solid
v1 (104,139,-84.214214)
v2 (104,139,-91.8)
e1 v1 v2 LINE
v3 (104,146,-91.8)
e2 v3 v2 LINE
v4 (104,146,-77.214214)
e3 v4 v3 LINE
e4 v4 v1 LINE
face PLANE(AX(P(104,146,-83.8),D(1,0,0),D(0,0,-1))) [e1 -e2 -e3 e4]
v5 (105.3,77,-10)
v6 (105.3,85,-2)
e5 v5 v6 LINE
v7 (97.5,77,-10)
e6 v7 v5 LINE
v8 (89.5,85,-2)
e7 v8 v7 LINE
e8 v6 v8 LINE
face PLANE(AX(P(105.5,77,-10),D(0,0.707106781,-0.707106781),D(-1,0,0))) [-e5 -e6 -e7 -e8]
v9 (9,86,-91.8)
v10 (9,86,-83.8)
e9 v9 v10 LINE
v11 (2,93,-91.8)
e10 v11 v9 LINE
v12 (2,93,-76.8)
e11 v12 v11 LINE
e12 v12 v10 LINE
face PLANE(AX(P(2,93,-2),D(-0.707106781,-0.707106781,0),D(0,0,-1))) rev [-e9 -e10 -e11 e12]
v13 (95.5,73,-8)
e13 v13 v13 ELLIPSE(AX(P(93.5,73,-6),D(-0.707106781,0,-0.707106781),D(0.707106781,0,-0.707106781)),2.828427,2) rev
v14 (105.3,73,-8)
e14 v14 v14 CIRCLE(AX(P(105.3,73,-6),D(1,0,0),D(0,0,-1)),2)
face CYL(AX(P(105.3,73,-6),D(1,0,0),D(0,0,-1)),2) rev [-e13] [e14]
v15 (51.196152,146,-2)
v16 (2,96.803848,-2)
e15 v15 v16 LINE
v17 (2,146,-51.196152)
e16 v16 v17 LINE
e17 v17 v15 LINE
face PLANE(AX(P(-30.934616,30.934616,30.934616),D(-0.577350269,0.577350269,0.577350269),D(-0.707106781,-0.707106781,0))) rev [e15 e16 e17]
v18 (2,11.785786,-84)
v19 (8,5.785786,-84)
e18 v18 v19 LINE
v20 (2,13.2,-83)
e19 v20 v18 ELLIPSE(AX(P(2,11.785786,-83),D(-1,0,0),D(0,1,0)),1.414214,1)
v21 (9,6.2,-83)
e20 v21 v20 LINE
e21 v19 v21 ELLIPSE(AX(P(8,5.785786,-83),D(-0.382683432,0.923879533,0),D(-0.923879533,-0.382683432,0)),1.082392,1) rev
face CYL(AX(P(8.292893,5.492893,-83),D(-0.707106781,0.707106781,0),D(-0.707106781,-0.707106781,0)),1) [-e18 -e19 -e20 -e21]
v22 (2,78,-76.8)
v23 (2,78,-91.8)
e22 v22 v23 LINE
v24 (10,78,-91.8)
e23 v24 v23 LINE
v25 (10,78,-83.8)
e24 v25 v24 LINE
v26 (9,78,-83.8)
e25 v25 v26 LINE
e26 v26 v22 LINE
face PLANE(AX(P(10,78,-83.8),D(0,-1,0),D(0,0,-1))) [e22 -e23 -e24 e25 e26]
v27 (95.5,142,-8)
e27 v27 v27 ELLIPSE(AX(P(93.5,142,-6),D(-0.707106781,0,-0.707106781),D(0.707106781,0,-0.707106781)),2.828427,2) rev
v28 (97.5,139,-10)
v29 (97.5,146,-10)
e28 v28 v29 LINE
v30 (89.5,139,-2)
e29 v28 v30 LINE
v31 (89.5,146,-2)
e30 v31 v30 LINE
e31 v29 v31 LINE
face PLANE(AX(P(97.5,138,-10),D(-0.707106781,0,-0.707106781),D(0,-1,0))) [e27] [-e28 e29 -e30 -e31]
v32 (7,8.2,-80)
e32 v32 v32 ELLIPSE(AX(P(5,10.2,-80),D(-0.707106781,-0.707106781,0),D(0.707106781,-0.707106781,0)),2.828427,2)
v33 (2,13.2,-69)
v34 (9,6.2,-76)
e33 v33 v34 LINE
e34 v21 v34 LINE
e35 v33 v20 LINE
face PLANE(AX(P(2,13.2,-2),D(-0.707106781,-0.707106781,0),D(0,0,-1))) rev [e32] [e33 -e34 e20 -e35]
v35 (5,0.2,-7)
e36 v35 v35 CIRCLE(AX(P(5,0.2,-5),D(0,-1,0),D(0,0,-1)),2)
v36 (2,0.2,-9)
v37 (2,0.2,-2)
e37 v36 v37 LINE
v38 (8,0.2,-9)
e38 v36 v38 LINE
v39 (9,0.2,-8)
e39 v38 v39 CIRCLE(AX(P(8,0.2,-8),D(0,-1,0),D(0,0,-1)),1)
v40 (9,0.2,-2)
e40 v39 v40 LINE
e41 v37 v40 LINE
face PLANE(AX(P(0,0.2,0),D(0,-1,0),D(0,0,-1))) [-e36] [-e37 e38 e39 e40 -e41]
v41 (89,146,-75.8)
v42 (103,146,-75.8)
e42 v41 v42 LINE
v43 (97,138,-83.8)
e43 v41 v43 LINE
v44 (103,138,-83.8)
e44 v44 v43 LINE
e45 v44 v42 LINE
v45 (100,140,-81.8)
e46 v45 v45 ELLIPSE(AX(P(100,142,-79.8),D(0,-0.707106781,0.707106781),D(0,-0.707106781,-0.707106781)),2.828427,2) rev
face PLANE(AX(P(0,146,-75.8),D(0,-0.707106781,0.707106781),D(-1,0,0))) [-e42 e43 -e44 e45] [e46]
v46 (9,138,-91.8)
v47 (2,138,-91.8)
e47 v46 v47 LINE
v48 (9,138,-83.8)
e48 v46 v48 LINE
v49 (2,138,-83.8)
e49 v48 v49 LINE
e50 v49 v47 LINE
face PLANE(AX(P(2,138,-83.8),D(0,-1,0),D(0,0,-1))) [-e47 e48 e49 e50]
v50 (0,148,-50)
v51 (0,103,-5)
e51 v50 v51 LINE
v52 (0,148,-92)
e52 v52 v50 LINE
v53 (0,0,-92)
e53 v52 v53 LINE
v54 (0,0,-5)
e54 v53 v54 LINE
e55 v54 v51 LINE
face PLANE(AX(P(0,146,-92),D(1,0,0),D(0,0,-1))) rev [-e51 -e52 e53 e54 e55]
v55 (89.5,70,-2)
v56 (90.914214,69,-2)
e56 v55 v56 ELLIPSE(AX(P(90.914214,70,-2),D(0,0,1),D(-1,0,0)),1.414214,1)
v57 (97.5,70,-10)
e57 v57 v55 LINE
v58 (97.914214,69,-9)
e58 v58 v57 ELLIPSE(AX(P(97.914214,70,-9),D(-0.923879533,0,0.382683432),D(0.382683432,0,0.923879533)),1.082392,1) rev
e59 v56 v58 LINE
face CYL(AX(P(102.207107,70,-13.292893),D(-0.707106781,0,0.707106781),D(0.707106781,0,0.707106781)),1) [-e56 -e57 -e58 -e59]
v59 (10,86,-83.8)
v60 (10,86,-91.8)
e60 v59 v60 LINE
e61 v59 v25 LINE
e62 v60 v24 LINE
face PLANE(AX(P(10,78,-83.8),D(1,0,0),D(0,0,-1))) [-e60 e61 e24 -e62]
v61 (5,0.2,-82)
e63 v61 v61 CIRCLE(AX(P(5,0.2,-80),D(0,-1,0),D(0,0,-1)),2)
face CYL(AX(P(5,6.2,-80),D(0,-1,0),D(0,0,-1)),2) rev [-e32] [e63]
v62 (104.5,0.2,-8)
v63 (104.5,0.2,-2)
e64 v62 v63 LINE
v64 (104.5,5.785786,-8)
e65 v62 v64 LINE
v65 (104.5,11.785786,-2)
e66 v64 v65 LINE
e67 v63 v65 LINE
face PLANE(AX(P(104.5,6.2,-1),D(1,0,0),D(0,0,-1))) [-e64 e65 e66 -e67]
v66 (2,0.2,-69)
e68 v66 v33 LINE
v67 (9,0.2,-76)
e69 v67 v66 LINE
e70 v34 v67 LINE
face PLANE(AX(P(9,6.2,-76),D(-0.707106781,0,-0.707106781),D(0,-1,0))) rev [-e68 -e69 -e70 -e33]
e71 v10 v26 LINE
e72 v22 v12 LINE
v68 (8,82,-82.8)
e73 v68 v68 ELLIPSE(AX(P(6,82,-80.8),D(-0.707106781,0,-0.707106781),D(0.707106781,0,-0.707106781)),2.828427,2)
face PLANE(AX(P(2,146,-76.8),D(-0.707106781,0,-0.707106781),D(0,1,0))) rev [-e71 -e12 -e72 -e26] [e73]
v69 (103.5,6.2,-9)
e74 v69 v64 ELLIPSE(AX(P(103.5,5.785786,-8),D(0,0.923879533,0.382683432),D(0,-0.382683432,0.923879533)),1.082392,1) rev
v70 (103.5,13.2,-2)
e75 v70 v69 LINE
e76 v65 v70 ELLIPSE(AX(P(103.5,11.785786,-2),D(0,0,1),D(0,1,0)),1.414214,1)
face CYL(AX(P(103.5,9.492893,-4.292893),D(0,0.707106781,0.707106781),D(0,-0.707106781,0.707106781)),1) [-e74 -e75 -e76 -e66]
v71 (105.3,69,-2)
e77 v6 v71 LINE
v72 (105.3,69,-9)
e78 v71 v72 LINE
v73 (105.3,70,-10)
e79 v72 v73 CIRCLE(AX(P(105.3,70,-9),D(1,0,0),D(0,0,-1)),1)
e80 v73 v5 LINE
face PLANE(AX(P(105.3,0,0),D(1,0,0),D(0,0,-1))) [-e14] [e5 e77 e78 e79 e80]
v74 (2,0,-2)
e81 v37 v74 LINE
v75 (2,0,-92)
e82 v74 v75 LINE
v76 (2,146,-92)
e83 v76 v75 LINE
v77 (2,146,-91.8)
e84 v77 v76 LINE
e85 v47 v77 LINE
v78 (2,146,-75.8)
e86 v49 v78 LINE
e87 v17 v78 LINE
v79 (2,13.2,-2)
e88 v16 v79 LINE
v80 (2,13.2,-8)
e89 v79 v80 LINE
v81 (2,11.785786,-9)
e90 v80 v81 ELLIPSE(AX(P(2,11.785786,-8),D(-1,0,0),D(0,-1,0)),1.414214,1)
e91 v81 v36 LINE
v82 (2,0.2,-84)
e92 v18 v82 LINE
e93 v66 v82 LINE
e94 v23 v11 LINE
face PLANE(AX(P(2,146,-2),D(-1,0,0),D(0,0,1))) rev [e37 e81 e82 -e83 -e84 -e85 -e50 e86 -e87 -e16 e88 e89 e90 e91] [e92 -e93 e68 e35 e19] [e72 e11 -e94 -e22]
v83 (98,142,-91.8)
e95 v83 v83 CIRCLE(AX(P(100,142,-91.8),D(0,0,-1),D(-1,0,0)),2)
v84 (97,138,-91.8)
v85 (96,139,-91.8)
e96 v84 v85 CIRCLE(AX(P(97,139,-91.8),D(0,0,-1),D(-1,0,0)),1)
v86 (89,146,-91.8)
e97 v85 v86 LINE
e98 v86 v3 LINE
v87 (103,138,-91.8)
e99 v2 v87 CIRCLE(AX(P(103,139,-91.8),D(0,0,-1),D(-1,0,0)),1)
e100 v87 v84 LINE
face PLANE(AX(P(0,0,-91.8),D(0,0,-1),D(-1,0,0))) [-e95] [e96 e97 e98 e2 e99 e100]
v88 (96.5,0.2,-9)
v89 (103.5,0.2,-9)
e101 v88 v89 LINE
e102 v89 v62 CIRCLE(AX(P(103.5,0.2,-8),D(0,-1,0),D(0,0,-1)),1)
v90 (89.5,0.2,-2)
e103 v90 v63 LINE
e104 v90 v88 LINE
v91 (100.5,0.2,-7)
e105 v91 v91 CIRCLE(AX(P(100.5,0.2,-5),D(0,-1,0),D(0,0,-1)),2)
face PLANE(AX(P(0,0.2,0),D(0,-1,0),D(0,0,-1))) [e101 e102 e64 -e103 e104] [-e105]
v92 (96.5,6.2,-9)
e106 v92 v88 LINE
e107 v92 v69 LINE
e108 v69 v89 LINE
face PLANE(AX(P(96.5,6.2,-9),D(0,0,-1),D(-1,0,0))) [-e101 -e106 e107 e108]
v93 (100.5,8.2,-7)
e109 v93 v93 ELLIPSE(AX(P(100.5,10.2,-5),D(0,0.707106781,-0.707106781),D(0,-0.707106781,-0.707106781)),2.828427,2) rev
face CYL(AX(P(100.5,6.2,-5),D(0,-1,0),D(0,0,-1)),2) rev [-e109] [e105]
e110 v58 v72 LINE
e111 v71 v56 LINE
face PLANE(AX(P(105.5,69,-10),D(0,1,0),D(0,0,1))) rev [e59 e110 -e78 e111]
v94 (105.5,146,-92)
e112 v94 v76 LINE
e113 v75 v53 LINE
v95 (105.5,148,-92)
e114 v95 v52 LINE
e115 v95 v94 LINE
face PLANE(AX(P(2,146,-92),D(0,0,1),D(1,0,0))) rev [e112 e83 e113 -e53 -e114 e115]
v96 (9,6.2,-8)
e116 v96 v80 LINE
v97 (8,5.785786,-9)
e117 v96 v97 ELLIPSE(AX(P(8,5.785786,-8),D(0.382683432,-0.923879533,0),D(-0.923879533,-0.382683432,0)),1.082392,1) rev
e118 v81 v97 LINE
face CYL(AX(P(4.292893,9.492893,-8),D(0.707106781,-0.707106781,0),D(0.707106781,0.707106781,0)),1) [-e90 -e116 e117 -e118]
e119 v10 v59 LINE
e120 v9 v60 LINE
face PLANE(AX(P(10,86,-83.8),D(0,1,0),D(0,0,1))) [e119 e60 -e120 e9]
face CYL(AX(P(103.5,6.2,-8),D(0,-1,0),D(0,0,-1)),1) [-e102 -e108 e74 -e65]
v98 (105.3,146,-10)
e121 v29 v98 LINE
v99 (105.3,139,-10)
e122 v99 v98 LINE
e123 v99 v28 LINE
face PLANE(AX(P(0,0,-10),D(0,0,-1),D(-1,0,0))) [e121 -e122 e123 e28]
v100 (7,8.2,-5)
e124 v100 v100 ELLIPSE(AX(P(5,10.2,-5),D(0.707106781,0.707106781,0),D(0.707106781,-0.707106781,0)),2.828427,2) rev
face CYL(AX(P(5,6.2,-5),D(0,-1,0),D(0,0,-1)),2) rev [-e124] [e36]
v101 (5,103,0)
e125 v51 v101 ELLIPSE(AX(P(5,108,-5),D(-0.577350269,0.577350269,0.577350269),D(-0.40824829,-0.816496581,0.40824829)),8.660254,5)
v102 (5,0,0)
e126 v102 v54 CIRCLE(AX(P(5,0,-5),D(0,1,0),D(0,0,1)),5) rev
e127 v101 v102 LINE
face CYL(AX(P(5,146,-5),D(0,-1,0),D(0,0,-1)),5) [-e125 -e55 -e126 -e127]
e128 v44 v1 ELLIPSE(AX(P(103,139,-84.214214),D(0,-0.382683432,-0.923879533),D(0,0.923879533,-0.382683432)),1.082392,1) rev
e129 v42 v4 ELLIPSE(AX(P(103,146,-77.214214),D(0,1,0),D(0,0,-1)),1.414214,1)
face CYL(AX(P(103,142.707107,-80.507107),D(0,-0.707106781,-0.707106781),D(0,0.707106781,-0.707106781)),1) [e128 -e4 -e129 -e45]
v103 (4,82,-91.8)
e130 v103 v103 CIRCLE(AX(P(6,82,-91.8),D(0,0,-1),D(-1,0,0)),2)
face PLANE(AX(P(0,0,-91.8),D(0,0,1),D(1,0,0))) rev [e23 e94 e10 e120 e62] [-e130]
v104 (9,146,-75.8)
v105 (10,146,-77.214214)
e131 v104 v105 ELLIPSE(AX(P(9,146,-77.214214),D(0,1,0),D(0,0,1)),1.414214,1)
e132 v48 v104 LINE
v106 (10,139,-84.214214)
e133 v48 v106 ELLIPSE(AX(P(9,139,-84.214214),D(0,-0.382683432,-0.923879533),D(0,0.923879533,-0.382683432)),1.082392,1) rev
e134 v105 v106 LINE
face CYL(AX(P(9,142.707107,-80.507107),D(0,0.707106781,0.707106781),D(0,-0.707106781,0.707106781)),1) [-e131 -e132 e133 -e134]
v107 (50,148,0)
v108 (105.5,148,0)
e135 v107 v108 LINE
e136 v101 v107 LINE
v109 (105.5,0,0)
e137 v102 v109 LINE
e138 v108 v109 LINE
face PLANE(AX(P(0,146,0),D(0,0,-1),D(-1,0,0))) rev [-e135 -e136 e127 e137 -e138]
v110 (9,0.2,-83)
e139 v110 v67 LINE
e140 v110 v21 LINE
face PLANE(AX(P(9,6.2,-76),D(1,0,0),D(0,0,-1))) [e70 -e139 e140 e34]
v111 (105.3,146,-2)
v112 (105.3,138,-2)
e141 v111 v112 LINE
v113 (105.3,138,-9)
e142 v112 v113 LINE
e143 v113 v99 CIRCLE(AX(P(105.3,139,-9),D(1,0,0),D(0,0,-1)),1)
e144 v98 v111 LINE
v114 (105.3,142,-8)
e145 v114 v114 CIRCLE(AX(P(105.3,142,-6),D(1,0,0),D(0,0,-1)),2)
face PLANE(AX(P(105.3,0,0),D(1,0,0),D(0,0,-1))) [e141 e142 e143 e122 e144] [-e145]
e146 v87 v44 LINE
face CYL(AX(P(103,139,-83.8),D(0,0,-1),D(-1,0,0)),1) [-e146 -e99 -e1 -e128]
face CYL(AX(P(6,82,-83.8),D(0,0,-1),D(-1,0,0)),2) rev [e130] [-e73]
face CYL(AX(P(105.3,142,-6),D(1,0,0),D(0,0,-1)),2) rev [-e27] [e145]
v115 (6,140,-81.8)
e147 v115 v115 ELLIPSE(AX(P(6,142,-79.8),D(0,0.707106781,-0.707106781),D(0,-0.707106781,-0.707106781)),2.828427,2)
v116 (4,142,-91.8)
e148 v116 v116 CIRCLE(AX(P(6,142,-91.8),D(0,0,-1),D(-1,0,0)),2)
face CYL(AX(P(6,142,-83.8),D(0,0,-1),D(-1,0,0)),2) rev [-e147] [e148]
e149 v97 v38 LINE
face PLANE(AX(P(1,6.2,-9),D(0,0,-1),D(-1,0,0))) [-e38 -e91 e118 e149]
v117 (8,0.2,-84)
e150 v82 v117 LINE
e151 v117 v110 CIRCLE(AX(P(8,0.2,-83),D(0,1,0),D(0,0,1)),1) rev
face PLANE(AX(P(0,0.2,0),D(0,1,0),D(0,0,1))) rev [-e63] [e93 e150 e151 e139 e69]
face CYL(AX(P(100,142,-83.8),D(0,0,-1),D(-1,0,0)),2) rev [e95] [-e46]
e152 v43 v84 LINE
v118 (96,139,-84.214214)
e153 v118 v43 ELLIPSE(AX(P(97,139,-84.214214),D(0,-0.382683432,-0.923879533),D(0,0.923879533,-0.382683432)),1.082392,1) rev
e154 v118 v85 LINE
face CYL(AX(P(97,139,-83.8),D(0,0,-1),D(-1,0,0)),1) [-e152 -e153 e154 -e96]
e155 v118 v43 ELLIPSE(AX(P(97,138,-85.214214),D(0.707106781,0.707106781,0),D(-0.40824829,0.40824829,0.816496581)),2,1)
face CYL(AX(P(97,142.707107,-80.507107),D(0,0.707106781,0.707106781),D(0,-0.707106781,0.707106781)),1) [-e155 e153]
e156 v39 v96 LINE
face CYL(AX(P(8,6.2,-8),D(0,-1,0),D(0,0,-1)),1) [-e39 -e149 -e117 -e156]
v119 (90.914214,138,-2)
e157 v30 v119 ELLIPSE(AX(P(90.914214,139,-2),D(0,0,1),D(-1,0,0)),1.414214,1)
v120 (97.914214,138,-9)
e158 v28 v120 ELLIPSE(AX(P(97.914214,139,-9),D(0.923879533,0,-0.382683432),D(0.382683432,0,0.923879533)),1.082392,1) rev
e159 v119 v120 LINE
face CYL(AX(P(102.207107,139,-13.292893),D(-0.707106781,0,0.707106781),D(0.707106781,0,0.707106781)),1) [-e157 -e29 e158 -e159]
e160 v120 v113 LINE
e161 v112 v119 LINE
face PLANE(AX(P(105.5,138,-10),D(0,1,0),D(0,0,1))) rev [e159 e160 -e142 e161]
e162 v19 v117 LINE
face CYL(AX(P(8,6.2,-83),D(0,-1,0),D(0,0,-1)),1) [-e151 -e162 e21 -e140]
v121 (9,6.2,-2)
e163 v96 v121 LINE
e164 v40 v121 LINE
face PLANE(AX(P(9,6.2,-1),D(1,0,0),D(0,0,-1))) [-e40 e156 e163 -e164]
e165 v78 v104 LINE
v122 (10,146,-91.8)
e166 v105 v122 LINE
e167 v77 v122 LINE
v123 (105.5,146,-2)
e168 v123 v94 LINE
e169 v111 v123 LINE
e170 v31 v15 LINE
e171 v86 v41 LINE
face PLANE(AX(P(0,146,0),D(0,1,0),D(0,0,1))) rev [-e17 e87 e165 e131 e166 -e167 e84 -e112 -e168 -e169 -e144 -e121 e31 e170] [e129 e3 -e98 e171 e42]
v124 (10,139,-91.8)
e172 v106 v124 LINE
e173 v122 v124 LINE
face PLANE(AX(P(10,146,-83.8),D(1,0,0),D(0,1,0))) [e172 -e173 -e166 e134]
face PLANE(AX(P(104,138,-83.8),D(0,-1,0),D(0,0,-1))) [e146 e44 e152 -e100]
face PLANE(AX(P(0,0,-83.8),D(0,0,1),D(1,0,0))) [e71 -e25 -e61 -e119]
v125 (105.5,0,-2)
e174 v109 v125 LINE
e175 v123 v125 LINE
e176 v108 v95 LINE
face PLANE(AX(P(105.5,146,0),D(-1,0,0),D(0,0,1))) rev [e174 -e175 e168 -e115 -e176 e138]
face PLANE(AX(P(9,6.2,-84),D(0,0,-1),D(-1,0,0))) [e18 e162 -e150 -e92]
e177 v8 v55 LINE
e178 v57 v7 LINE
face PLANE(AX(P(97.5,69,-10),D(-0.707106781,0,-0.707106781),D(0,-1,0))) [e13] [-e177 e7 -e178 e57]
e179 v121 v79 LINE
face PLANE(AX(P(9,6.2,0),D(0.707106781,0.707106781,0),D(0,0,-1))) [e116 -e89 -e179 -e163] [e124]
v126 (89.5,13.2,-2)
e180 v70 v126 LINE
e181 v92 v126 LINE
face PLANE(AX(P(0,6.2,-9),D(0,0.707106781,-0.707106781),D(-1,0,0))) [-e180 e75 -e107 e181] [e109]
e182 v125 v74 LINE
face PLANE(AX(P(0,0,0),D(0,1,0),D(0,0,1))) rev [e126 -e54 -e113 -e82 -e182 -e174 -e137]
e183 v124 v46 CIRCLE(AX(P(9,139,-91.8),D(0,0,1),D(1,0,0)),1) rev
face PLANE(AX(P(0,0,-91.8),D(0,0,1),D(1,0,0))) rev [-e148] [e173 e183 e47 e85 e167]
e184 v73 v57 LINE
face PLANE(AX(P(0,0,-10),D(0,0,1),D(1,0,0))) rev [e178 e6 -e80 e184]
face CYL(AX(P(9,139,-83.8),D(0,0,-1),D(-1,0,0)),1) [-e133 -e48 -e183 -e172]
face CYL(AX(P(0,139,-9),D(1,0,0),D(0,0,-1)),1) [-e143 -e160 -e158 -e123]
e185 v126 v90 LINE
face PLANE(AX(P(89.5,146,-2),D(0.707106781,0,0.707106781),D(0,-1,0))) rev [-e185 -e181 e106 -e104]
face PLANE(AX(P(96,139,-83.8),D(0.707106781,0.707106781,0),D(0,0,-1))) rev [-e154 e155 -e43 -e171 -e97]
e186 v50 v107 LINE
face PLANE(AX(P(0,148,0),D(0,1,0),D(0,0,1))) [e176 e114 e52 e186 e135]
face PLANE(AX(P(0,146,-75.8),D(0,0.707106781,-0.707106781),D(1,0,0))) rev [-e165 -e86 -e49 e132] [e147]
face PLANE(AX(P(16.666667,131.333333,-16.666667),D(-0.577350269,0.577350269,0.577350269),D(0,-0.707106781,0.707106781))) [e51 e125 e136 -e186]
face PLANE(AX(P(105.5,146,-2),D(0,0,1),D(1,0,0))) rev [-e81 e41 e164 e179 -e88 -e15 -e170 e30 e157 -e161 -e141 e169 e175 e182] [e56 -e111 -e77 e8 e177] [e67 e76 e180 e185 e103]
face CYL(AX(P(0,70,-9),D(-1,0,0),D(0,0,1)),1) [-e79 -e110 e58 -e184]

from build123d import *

# Parameters (mm, degrees)
BOSS_EXTRUDE1_DEPTH       = 146
SKETCH2_W                 = 105.5
SKETCH2_H                 = 92
BOSS_EXTRUDE2_DEPTH       = 2
BOSS_EXTRUDE3_START       = -0.2
SKETCH3_W                 = 7
SKETCH3_H                 = 8
SKETCH3_R                 = 2
SKETCH3_W_2               = 8
BOSS_EXTRUDE3_DEPTH       = 6
SKETCH4_W                 = 8
SKETCH4_H                 = 8
BOSS_EXTRUDE4_DEPTH       = 8
SKETCH5_W                 = 8
SKETCH5_H                 = 77
CUT_EXTRUDE1_DEPTH        = 0.2
F_4_0MM_DOWEL_HOLE1_D     = 4
F_4_0MM_DOWEL_HOLE1_DEPTH = 7.8
CHAMFER2_SIZE             = 8
BOSS_EXTRUDE5_START       = -0.2
SKETCH9_W                 = 8
SKETCH9_H                 = 8
SKETCH9_R                 = 2
BOSS_EXTRUDE5_DEPTH       = 8
CHAMFER3_SIZE             = 8
CHAMFER1_SIZE             = 7
CHAMFER4_SIZE             = 7
FILLET1_R                 = 1
SKETCH15_R                = 50
CUT_EXTRUDE4_DEPTH        = 219.937395923
BOSS_EXTRUDE7_DEPTH       = 3
FILLET2_R                 = 5


# Some blends are built 0.0001 mm under size
with BuildPart() as part:
    # Sketch1 → Boss-Extrude1 (new body)
    with BuildSketch(Plane(origin=(0, 0, 0), x_dir=(1, 0, 0), z_dir=(0, 1, 0))):
        Polygon((0, 0), (105.5, 0), (105.5, 2), (2, 2), (2, 92), (0, 92), align=None)
    extrude(amount=BOSS_EXTRUDE1_DEPTH)

    # Sketch2 → Boss-Extrude2 (add)
    with BuildSketch(Plane(origin=(0, 146, 0), x_dir=(1, 0, 0), z_dir=(0, 1, 0))):
        with Locations((52.75, 46)):
            Rectangle(SKETCH2_W, SKETCH2_H)
    extrude(amount=BOSS_EXTRUDE2_DEPTH)

    # Sketch3 → Boss-Extrude3 (add)
    # profile 1 of 3: a face of its own
    with BuildSketch(Plane.XZ.offset(BOSS_EXTRUDE3_START)):
        with Locations((5.5, -80)):
            Rectangle(SKETCH3_W, SKETCH3_H)
        with Locations(Location((5, -80, 0), (0, 0, 270))):
            Circle(SKETCH3_R, mode=Mode.SUBTRACT)
    # profile 2 of 3: a face of its own
    with BuildSketch(Plane.XZ.offset(BOSS_EXTRUDE3_START)):
        with Locations((5, -5)):
            Rectangle(SKETCH3_W_2, SKETCH3_H)
        with Locations(Location((5, -5, 0), (0, 0, 270))):
            Circle(SKETCH3_R, mode=Mode.SUBTRACT)
    # profile 3 of 3: a face of its own
    with BuildSketch(Plane.XZ.offset(BOSS_EXTRUDE3_START)):
        with Locations((100.5, -5)):
            Rectangle(SKETCH3_W_2, SKETCH3_H)
        with Locations(Location((100.5, -5, 0), (0, 0, 270))):
            Circle(SKETCH3_R, mode=Mode.SUBTRACT)
    extrude(amount=-BOSS_EXTRUDE3_DEPTH)

    # Sketch4 → Boss-Extrude4 (add)
    with BuildSketch(Plane(origin=(0, 0, -2), x_dir=(-1, 0, 0), z_dir=(0, 0, -1))):
        with Locations((-101.5, 73)):
            Rectangle(SKETCH4_W, SKETCH4_H)
        with Locations((-101.5, 142)):
            Rectangle(SKETCH4_W, SKETCH4_H)
    extrude(amount=BOSS_EXTRUDE4_DEPTH)

    # Sketch5 → Cut-Extrude1 (cut)
    with BuildSketch(Plane(origin=(105.5, 0, 0), x_dir=(0, 0, -1), z_dir=(1, 0, 0))):
        with Locations((6, 107.5)):
            Rectangle(SKETCH5_W, SKETCH5_H)
    extrude(amount=-CUT_EXTRUDE1_DEPTH, mode=Mode.SUBTRACT)

    # Ø4.0mm Dowel Hole1
    with Locations(Plane(origin=(105.3, 0, 0), x_dir=(0, 0, -1), z_dir=(1, 0, 0))):
        with Locations((6, 142), (6, 73)):
            Hole(F_4_0MM_DOWEL_HOLE1_D / 2, depth=F_4_0MM_DOWEL_HOLE1_DEPTH)

    # Chamfer2
    # the kernel refuses this chamfer: 8 mm, written as the material it adds along each edge
    with BuildSketch(Plane(origin=(97.5, 138, -2), x_dir=(-0.9996219169112968, 0, 0.02749587661058654), z_dir=(0, 1, 0))) as chamfer2_piece_1_section:
        Polygon((CHAMFER2_SIZE * 0.999621916911, -CHAMFER2_SIZE * 0.0274958766106), (-CHAMFER2_SIZE * 0.0274958766106, -CHAMFER2_SIZE * 0.999621916911), (0, 0), align=None)
    chamfer2_piece_1 = extrude(amount=8, mode=Mode.PRIVATE)
    chamfer2_piece_1 = split(chamfer2_piece_1, bisect_by=Plane(origin=(90.688027192, 144.666666667, -10), z_dir=(0, 0, 1)), keep=Keep.TOP, mode=Mode.PRIVATE)
    chamfer2_piece_1 = chamfer2_piece_1 - Plane(origin=(90.688027192, 142, -6), x_dir=(0, 0, 1), z_dir=(-1, 0, 0)) * Cylinder(2, 48, mode=Mode.PRIVATE)
    add(chamfer2_piece_1)
    with BuildSketch(Plane(origin=(97.5, 69, -2), x_dir=(-0.9996219169112968, 0, 0.02749587661058654), z_dir=(0, 1, 0))) as chamfer2_piece_2_section:
        Polygon((CHAMFER2_SIZE * 0.999621916911, -CHAMFER2_SIZE * 0.0274958766106), (-CHAMFER2_SIZE * 0.0274958766106, -CHAMFER2_SIZE * 0.999621916911), (0, 0), align=None)
    chamfer2_piece_2 = extrude(amount=8, mode=Mode.PRIVATE)
    chamfer2_piece_2 = split(chamfer2_piece_2, bisect_by=Plane(origin=(90.688027192, 75.666666667, -10), z_dir=(0, 0, 1)), keep=Keep.TOP, mode=Mode.PRIVATE)
    chamfer2_piece_2 = chamfer2_piece_2 - Plane(origin=(90.688027192, 73, -6), x_dir=(0, 0, 1), z_dir=(-1, 0, 0)) * Cylinder(2, 48, mode=Mode.PRIVATE)
    add(chamfer2_piece_2)

    # Sketch9 → Boss-Extrude5 (add)
    # profile 1 of 3: a face of its own
    with BuildSketch(Plane(origin=(0, 0, -92), x_dir=(-1, 0, 0), z_dir=(0, 0, -1)).offset(BOSS_EXTRUDE5_START)):
        with Locations((-6, 142)):
            Rectangle(SKETCH9_W, SKETCH9_H)
        with Locations((-6, 142)):
            Circle(SKETCH9_R, mode=Mode.SUBTRACT)
    # profile 2 of 3: a face of its own
    with BuildSketch(Plane(origin=(0, 0, -92), x_dir=(-1, 0, 0), z_dir=(0, 0, -1)).offset(BOSS_EXTRUDE5_START)):
        with Locations((-100, 142)):
            Rectangle(SKETCH9_W, SKETCH9_H)
        with Locations((-100, 142)):
            Circle(SKETCH9_R, mode=Mode.SUBTRACT)
    # profile 3 of 3: a face of its own
    with BuildSketch(Plane(origin=(0, 0, -92), x_dir=(-1, 0, 0), z_dir=(0, 0, -1)).offset(BOSS_EXTRUDE5_START)):
        with Locations((-6, 82)):
            Rectangle(SKETCH9_W, SKETCH9_H)
        with Locations((-6, 82)):
            Circle(SKETCH9_R, mode=Mode.SUBTRACT)
    extrude(amount=-BOSS_EXTRUDE5_DEPTH)

    # Chamfer3
    # the kernel refuses this chamfer: 8 mm, written as the material it adds along each edge
    with BuildSketch(Plane(origin=(2, 146, -83.8), x_dir=(0, 0.027495876610585647, 0.9996219169112968), z_dir=(1, 0, 0))) as chamfer3_piece_1_section:
        Polygon((CHAMFER3_SIZE * 0.999621916911, CHAMFER3_SIZE * 0.0274958766106), (-CHAMFER3_SIZE * 0.0274958766106, CHAMFER3_SIZE * 0.999621916911), (0, 0), align=None)
    chamfer3_piece_1 = extrude(amount=8, mode=Mode.PRIVATE)
    chamfer3_piece_1 = split(chamfer3_piece_1, bisect_by=Plane(origin=(8.666666667, 138, -76.988027286), z_dir=(0, 1, 0)), keep=Keep.TOP, mode=Mode.PRIVATE)
    chamfer3_piece_1 = chamfer3_piece_1 - Plane(origin=(6, 142, -76.988027286), x_dir=(-1, 0, 0), z_dir=(0, 0, -1)) * Cylinder(2, 48, mode=Mode.PRIVATE)
    add(chamfer3_piece_1)
    with BuildSketch(Plane(origin=(104, 146, -83.8), x_dir=(0, 0.027495876610585647, 0.9996219169112968), z_dir=(-1, 0, 0))) as chamfer3_piece_2_section:
        Polygon((CHAMFER3_SIZE * 0.999621916911, -CHAMFER3_SIZE * 0.0274958766106), (-CHAMFER3_SIZE * 0.0274958766106, -CHAMFER3_SIZE * 0.999621916911), (0, 0), align=None)
    chamfer3_piece_2 = extrude(amount=8, mode=Mode.PRIVATE)
    chamfer3_piece_2 = split(chamfer3_piece_2, bisect_by=Plane(origin=(97.333333333, 138, -76.988027286), z_dir=(0, 1, 0)), keep=Keep.TOP, mode=Mode.PRIVATE)
    chamfer3_piece_2 = chamfer3_piece_2 - Plane(origin=(100, 142, -76.988027286), x_dir=(-1, 0, 0), z_dir=(0, 0, -1)) * Cylinder(2, 48, mode=Mode.PRIVATE)
    add(chamfer3_piece_2)
    with BuildSketch(Plane(origin=(105.3, 77, -2), x_dir=(7.35283608460706e-15, 0.9996219169112968, 0.02749587661058559), z_dir=(-1, 0, 0))) as chamfer3_piece_3_section:
        Polygon((CHAMFER3_SIZE * 0.999621916911, CHAMFER3_SIZE * 0.0274958766106), (-CHAMFER3_SIZE * 0.0274958766106, CHAMFER3_SIZE * 0.999621916911), (0, 0), align=None)
    chamfer3_piece_3 = extrude(amount=36.373463904, mode=Mode.PRIVATE)
    chamfer3_piece_3 = split(chamfer3_piece_3, bisect_by=Plane(origin=(95.192873565, 79.806448266, -7.692873565), z_dir=(0.7071067811868302, 0, 0.7071067811862649)), keep=Keep.TOP, mode=Mode.PRIVATE)
    chamfer3_piece_3 = split(chamfer3_piece_3, bisect_by=Plane(origin=(98.56191571, 79.806448266, -10), z_dir=(0, 0, 1)), keep=Keep.TOP, mode=Mode.PRIVATE)
    add(chamfer3_piece_3)

    # Chamfer1
    chamfer1_edges = [part.edges().sort_by_distance(p)[0] for p in [
        (2, 86, -87.8),
    ]]
    chamfer(chamfer1_edges, length=CHAMFER1_SIZE)
    # the kernel refuses this chamfer: 7 mm, written as the material it adds along each edge
    with BuildSketch(Plane(origin=(104.5, 6.2, -2), x_dir=(0, 0.9996219169112968, 0.02749587661058637), z_dir=(-1, 0, 0))) as chamfer1_2_piece_1_section:
        with BuildLine():
            Line((7.200712366, 0), (-0.395830084, 7.189824555))
            Line((-0.395830084, 7.189824555), (-0.535777153, 7.185975132))
            ThreePointArc((-0.535777153, 7.185975132), (-0.238904589, 3.593784808), (-0.139947068, -0.003849423))
            Line((-0.139947068, -0.003849423), (0.003849423, -0.139947068))
            ThreePointArc((0.003849423, -0.139947068), (3.601483653, -0.040989547), (7.204561789, -0.139947068))
            Line((7.204561789, -0.139947068), (7.200712366, 0))
        make_face()
    chamfer1_2_piece_1 = extrude(amount=8, mode=Mode.PRIVATE)
    chamfer1_2_piece_1 = split(chamfer1_2_piece_1, bisect_by=Plane(origin=(97.833333333, 12.159669312, -9), z_dir=(0, 0, 1)), keep=Keep.TOP, mode=Mode.PRIVATE)
    chamfer1_2_piece_1 = chamfer1_2_piece_1 - Plane(origin=(100.5, 12.159669312, -5), x_dir=(0, 0, -1), z_dir=(0, -1, 0)) * Cylinder(2, 45, mode=Mode.PRIVATE)
    add(chamfer1_2_piece_1)
    # the kernel refuses this chamfer: 7 mm, written as the material it adds along each edge
    with BuildSketch(Plane(origin=(2, 6.2, -84), x_dir=(-0.027495876610586556, 0.9996219169112968, 0), z_dir=(0, 0, 1))) as chamfer1_3_piece_1_section:
        with BuildLine():
            Line((7.200712366, 0), (-0.395830084, -7.189824555))
            Line((-0.395830084, -7.189824555), (-0.535777153, -7.185975132))
            ThreePointArc((-0.535777153, -7.185975132), (-0.238904589, -3.593784808), (-0.139947068, 0.003849423))
            Line((-0.139947068, 0.003849423), (0.003849423, 0.139947068))
            ThreePointArc((0.003849423, 0.139947068), (3.601483653, 0.040989547), (7.204561789, 0.139947068))
            Line((7.204561789, 0.139947068), (7.200712366, 0))
        make_face()
    chamfer1_3_piece_1 = extrude(amount=8, mode=Mode.PRIVATE)
    chamfer1_3_piece_1 = split(chamfer1_3_piece_1, bisect_by=Plane(origin=(9, 12.159669426, -77.333333333), z_dir=(-1, 0, 0)), keep=Keep.TOP, mode=Mode.PRIVATE)
    chamfer1_3_piece_1 = chamfer1_3_piece_1 - Plane(origin=(5, 12.159669426, -80), x_dir=(0, 0, -1), z_dir=(0, -1, 0)) * Cylinder(2, 45, mode=Mode.PRIVATE)
    add(chamfer1_3_piece_1)
    # the kernel refuses this chamfer: 7 mm, written as the material it adds along each edge
    with BuildSketch(Plane(origin=(2, 6.2, -2), x_dir=(-0.02749587661058637, 0.9996219169112968, 0), z_dir=(0, 0, -1))) as chamfer1_4_piece_1_section:
        with BuildLine():
            Line((7.200712366, 0), (-0.395830084, 7.189824555))
            Line((-0.395830084, 7.189824555), (-0.535777153, 7.185975132))
            ThreePointArc((-0.535777153, 7.185975132), (-0.238904589, 3.593784808), (-0.139947068, -0.003849423))
            Line((-0.139947068, -0.003849423), (0.003849423, -0.139947068))
            ThreePointArc((0.003849423, -0.139947068), (3.601483653, -0.040989547), (7.204561789, -0.139947068))
            Line((7.204561789, -0.139947068), (7.200712366, 0))
        make_face()
    chamfer1_4_piece_1 = extrude(amount=7, mode=Mode.PRIVATE)
    chamfer1_4_piece_1 = split(chamfer1_4_piece_1, bisect_by=Plane(origin=(9, 12.161920808, -7.833333333), z_dir=(-1, 0, 0)), keep=Keep.TOP, mode=Mode.PRIVATE)
    chamfer1_4_piece_1 = chamfer1_4_piece_1 - Plane(origin=(5, 12.161920808, -5), x_dir=(0, 0, -1), z_dir=(0, -1, 0)) * Cylinder(2, 43, mode=Mode.PRIVATE)
    add(chamfer1_4_piece_1)

    # Chamfer4
    # the kernel refuses this chamfer: 7 mm, written as the material it adds along each edge
    with BuildSketch(Plane(origin=(2, 31.201780916, -76), x_dir=(-0.027495876610586403, -2.1873373005352424e-15, 0.9996219169112968), z_dir=(0, -1, 0))) as chamfer4_piece_1_section:
        Polygon((CHAMFER4_SIZE * 0.999621916911, -CHAMFER4_SIZE * 0.0274958766106), (-CHAMFER4_SIZE * 0.0274958766106, -CHAMFER4_SIZE * 0.999621916911), (0, 0), align=None)
    chamfer4_piece_1 = extrude(amount=31.001780916, mode=Mode.PRIVATE)
    chamfer4_piece_1 = split(chamfer4_piece_1, bisect_by=Plane(origin=(6.759568818, 8.440431182, -73.53334602), z_dir=(-0.707106781186299, -0.7071067811867962, 0)), keep=Keep.TOP, mode=Mode.PRIVATE)
    chamfer4_piece_1 = split(chamfer4_piece_1, bisect_by=Plane(origin=(9, 5.693620788, -73.53334602), z_dir=(-1, 0, 0)), keep=Keep.TOP, mode=Mode.PRIVATE)
    add(chamfer4_piece_1)
    with BuildSketch(Plane(origin=(96.5, 0.2, -2), x_dir=(-0.9996219169112968, 4.370447847260361e-15, 0.02749587661058656), z_dir=(0, 1, 0))) as chamfer4_piece_2_section:
        Polygon((CHAMFER4_SIZE * 0.999621916911, -CHAMFER4_SIZE * 0.0274958766106), (-CHAMFER4_SIZE * 0.0274958766106, -CHAMFER4_SIZE * 0.999621916911), (0, 0), align=None)
    chamfer4_piece_2 = extrude(amount=31.001780916, mode=Mode.PRIVATE)
    chamfer4_piece_2 = split(chamfer4_piece_2, bisect_by=Plane(origin=(94.03334602, 8.440431182, -6.759568818), z_dir=(0, -0.7071067811867962, 0.707106781186299)), keep=Keep.TOP, mode=Mode.PRIVATE)
    chamfer4_piece_2 = split(chamfer4_piece_2, bisect_by=Plane(origin=(94.03334602, 5.693620788, -9), z_dir=(0, 0, 1)), keep=Keep.TOP, mode=Mode.PRIVATE)
    add(chamfer4_piece_2)
    with BuildSketch(Plane(origin=(96, 146, -91.8), x_dir=(-0.9996219169112968, 0.027495876610586126, -1.967830739555515e-15), z_dir=(0, 0, 1))) as chamfer4_piece_3_section:
        Polygon((CHAMFER4_SIZE * 0.999621916911, CHAMFER4_SIZE * 0.0274958766106), (-CHAMFER4_SIZE * 0.0274958766106, CHAMFER4_SIZE * 0.999621916911), (0, 0), align=None)
    chamfer4_piece_3 = extrude(amount=34.001780916, mode=Mode.PRIVATE)
    chamfer4_piece_3 = split(chamfer4_piece_3, bisect_by=Plane(origin=(93.569946265, 140.439034316, -81.360965684), z_dir=(0, 0.7071067811862649, -0.7071067811868302)), keep=Keep.TOP, mode=Mode.PRIVATE)
    add(chamfer4_piece_3)
    with BuildSketch(Plane(origin=(2, 78, -83.8), x_dir=(-0.027495876610586497, 0, 0.9996219169112968), z_dir=(0, 1, 0))) as chamfer4_piece_4_section:
        Polygon((CHAMFER4_SIZE * 0.999621916911, CHAMFER4_SIZE * 0.0274958766106), (-CHAMFER4_SIZE * 0.0274958766106, CHAMFER4_SIZE * 0.999621916911), (0, 0), align=None)
    chamfer4_piece_4 = extrude(amount=33.001780916, mode=Mode.PRIVATE)
    chamfer4_piece_4 = split(chamfer4_piece_4, bisect_by=Plane(origin=(8.497935299, 86.502064701, -81.32656752), z_dir=(-0.7071067811865476, -0.7071067811865476, 0)), keep=Keep.TOP, mode=Mode.PRIVATE)
    chamfer4_piece_4 = split(chamfer4_piece_4, bisect_by=Plane(origin=(3.995792094, 86, -81.32656752), z_dir=(0, -1, 0)), keep=Keep.TOP, mode=Mode.PRIVATE)
    chamfer4_piece_4 = chamfer4_piece_4 - Plane(origin=(6, 82, -81.32656752), x_dir=(-1, 0, 0), z_dir=(0, 0, -1)) * Cylinder(2, 94, mode=Mode.PRIVATE)
    add(chamfer4_piece_4)
    with BuildSketch(Plane(origin=(2, 78, -83.8), x_dir=(-0.027495876610586497, 0, 0.9996219169112968), z_dir=(0, 1, 0))) as chamfer4_piece_5_section:
        Polygon((CHAMFER4_SIZE * 0.999621916911, CHAMFER4_SIZE * 0.0274958766106), (-CHAMFER4_SIZE * 0.0274958766106, CHAMFER4_SIZE * 0.999621916911), (0, 0), align=None)
    chamfer4_piece_5 = extrude(amount=33.001780916, mode=Mode.PRIVATE)
    chamfer4_piece_5 = split(chamfer4_piece_5, bisect_by=Plane(origin=(4.984102881, 90.015897119, -81.136955408), z_dir=(-0.7071067811865476, -0.7071067811865476, 0)), keep=Keep.TOP, mode=Mode.PRIVATE)
    chamfer4_piece_5 = split(chamfer4_piece_5, bisect_by=Plane(origin=(3.645470507, 86, -81.136955408), z_dir=(0, 1, 0)), keep=Keep.TOP, mode=Mode.PRIVATE)
    add(chamfer4_piece_5)

    # Fillet1
    fillet1_edges = [part.edges().sort_by_distance(p)[0] for p in [
        (9, 3.2, -84),
        (5.5, 9.7, -84),
        (9, 3.2, -9),
        (104.5, 3.2, -9),
        (104.5, 9.7, -5.5),
        (5.5, 9.7, -9),
        (93.5, 138, -6),
        (101.4, 138, -10),
        (101.4, 69, -10),
        (93.5, 69, -6),
        (96, 138.5, -83.3),
        (96, 138, -87.8),
        (104, 142, -79.8),
        (104, 138, -87.8),
        (10, 142, -79.8),
        (10, 138, -87.8),
    ]]
    fillet(fillet1_edges, radius=FILLET1_R - 0.0001)  # a hair under: the kernel refuses the full size

    # Sketch15 → Cut-Extrude4 (cut, through all)
    with BuildSketch(Plane(origin=(-32.666666667, 32.666666667, 32.666666667), x_dir=(0.8164965809277261, 0.408248290463863, 0.408248290463863), z_dir=(-0.5773502691896257, 0.5773502691896258, 0.5773502691896258))):
        with Locations((60.420746989, 104.651803616)):
            Circle(SKETCH15_R)
    extrude(amount=CUT_EXTRUDE4_DEPTH, mode=Mode.SUBTRACT)

    # Sketch16 → Boss-Extrude7 (add)
    with BuildSketch(Plane(origin=(-32.666666667, 32.666666667, 32.666666667), x_dir=(0.40824829046386274, -0.40824829046386296, 0.8164965809277264), z_dir=(-0.5773502691896258, 0.5773502691896262, 0.5773502691896255))):
        Polygon((-101.245576035, 104.651803616), (-40.008332465, 69.296464556), (-40.008332465, 140.007142675), align=None)
    extrude(amount=-BOSS_EXTRUDE7_DEPTH)

    # Fillet2
    fillet2_edges = [part.edges().sort_by_distance(p)[0] for p in [
        (0, 49, 0),
    ]]
    fillet(fillet2_edges, radius=FILLET2_R)


solid = part.part
